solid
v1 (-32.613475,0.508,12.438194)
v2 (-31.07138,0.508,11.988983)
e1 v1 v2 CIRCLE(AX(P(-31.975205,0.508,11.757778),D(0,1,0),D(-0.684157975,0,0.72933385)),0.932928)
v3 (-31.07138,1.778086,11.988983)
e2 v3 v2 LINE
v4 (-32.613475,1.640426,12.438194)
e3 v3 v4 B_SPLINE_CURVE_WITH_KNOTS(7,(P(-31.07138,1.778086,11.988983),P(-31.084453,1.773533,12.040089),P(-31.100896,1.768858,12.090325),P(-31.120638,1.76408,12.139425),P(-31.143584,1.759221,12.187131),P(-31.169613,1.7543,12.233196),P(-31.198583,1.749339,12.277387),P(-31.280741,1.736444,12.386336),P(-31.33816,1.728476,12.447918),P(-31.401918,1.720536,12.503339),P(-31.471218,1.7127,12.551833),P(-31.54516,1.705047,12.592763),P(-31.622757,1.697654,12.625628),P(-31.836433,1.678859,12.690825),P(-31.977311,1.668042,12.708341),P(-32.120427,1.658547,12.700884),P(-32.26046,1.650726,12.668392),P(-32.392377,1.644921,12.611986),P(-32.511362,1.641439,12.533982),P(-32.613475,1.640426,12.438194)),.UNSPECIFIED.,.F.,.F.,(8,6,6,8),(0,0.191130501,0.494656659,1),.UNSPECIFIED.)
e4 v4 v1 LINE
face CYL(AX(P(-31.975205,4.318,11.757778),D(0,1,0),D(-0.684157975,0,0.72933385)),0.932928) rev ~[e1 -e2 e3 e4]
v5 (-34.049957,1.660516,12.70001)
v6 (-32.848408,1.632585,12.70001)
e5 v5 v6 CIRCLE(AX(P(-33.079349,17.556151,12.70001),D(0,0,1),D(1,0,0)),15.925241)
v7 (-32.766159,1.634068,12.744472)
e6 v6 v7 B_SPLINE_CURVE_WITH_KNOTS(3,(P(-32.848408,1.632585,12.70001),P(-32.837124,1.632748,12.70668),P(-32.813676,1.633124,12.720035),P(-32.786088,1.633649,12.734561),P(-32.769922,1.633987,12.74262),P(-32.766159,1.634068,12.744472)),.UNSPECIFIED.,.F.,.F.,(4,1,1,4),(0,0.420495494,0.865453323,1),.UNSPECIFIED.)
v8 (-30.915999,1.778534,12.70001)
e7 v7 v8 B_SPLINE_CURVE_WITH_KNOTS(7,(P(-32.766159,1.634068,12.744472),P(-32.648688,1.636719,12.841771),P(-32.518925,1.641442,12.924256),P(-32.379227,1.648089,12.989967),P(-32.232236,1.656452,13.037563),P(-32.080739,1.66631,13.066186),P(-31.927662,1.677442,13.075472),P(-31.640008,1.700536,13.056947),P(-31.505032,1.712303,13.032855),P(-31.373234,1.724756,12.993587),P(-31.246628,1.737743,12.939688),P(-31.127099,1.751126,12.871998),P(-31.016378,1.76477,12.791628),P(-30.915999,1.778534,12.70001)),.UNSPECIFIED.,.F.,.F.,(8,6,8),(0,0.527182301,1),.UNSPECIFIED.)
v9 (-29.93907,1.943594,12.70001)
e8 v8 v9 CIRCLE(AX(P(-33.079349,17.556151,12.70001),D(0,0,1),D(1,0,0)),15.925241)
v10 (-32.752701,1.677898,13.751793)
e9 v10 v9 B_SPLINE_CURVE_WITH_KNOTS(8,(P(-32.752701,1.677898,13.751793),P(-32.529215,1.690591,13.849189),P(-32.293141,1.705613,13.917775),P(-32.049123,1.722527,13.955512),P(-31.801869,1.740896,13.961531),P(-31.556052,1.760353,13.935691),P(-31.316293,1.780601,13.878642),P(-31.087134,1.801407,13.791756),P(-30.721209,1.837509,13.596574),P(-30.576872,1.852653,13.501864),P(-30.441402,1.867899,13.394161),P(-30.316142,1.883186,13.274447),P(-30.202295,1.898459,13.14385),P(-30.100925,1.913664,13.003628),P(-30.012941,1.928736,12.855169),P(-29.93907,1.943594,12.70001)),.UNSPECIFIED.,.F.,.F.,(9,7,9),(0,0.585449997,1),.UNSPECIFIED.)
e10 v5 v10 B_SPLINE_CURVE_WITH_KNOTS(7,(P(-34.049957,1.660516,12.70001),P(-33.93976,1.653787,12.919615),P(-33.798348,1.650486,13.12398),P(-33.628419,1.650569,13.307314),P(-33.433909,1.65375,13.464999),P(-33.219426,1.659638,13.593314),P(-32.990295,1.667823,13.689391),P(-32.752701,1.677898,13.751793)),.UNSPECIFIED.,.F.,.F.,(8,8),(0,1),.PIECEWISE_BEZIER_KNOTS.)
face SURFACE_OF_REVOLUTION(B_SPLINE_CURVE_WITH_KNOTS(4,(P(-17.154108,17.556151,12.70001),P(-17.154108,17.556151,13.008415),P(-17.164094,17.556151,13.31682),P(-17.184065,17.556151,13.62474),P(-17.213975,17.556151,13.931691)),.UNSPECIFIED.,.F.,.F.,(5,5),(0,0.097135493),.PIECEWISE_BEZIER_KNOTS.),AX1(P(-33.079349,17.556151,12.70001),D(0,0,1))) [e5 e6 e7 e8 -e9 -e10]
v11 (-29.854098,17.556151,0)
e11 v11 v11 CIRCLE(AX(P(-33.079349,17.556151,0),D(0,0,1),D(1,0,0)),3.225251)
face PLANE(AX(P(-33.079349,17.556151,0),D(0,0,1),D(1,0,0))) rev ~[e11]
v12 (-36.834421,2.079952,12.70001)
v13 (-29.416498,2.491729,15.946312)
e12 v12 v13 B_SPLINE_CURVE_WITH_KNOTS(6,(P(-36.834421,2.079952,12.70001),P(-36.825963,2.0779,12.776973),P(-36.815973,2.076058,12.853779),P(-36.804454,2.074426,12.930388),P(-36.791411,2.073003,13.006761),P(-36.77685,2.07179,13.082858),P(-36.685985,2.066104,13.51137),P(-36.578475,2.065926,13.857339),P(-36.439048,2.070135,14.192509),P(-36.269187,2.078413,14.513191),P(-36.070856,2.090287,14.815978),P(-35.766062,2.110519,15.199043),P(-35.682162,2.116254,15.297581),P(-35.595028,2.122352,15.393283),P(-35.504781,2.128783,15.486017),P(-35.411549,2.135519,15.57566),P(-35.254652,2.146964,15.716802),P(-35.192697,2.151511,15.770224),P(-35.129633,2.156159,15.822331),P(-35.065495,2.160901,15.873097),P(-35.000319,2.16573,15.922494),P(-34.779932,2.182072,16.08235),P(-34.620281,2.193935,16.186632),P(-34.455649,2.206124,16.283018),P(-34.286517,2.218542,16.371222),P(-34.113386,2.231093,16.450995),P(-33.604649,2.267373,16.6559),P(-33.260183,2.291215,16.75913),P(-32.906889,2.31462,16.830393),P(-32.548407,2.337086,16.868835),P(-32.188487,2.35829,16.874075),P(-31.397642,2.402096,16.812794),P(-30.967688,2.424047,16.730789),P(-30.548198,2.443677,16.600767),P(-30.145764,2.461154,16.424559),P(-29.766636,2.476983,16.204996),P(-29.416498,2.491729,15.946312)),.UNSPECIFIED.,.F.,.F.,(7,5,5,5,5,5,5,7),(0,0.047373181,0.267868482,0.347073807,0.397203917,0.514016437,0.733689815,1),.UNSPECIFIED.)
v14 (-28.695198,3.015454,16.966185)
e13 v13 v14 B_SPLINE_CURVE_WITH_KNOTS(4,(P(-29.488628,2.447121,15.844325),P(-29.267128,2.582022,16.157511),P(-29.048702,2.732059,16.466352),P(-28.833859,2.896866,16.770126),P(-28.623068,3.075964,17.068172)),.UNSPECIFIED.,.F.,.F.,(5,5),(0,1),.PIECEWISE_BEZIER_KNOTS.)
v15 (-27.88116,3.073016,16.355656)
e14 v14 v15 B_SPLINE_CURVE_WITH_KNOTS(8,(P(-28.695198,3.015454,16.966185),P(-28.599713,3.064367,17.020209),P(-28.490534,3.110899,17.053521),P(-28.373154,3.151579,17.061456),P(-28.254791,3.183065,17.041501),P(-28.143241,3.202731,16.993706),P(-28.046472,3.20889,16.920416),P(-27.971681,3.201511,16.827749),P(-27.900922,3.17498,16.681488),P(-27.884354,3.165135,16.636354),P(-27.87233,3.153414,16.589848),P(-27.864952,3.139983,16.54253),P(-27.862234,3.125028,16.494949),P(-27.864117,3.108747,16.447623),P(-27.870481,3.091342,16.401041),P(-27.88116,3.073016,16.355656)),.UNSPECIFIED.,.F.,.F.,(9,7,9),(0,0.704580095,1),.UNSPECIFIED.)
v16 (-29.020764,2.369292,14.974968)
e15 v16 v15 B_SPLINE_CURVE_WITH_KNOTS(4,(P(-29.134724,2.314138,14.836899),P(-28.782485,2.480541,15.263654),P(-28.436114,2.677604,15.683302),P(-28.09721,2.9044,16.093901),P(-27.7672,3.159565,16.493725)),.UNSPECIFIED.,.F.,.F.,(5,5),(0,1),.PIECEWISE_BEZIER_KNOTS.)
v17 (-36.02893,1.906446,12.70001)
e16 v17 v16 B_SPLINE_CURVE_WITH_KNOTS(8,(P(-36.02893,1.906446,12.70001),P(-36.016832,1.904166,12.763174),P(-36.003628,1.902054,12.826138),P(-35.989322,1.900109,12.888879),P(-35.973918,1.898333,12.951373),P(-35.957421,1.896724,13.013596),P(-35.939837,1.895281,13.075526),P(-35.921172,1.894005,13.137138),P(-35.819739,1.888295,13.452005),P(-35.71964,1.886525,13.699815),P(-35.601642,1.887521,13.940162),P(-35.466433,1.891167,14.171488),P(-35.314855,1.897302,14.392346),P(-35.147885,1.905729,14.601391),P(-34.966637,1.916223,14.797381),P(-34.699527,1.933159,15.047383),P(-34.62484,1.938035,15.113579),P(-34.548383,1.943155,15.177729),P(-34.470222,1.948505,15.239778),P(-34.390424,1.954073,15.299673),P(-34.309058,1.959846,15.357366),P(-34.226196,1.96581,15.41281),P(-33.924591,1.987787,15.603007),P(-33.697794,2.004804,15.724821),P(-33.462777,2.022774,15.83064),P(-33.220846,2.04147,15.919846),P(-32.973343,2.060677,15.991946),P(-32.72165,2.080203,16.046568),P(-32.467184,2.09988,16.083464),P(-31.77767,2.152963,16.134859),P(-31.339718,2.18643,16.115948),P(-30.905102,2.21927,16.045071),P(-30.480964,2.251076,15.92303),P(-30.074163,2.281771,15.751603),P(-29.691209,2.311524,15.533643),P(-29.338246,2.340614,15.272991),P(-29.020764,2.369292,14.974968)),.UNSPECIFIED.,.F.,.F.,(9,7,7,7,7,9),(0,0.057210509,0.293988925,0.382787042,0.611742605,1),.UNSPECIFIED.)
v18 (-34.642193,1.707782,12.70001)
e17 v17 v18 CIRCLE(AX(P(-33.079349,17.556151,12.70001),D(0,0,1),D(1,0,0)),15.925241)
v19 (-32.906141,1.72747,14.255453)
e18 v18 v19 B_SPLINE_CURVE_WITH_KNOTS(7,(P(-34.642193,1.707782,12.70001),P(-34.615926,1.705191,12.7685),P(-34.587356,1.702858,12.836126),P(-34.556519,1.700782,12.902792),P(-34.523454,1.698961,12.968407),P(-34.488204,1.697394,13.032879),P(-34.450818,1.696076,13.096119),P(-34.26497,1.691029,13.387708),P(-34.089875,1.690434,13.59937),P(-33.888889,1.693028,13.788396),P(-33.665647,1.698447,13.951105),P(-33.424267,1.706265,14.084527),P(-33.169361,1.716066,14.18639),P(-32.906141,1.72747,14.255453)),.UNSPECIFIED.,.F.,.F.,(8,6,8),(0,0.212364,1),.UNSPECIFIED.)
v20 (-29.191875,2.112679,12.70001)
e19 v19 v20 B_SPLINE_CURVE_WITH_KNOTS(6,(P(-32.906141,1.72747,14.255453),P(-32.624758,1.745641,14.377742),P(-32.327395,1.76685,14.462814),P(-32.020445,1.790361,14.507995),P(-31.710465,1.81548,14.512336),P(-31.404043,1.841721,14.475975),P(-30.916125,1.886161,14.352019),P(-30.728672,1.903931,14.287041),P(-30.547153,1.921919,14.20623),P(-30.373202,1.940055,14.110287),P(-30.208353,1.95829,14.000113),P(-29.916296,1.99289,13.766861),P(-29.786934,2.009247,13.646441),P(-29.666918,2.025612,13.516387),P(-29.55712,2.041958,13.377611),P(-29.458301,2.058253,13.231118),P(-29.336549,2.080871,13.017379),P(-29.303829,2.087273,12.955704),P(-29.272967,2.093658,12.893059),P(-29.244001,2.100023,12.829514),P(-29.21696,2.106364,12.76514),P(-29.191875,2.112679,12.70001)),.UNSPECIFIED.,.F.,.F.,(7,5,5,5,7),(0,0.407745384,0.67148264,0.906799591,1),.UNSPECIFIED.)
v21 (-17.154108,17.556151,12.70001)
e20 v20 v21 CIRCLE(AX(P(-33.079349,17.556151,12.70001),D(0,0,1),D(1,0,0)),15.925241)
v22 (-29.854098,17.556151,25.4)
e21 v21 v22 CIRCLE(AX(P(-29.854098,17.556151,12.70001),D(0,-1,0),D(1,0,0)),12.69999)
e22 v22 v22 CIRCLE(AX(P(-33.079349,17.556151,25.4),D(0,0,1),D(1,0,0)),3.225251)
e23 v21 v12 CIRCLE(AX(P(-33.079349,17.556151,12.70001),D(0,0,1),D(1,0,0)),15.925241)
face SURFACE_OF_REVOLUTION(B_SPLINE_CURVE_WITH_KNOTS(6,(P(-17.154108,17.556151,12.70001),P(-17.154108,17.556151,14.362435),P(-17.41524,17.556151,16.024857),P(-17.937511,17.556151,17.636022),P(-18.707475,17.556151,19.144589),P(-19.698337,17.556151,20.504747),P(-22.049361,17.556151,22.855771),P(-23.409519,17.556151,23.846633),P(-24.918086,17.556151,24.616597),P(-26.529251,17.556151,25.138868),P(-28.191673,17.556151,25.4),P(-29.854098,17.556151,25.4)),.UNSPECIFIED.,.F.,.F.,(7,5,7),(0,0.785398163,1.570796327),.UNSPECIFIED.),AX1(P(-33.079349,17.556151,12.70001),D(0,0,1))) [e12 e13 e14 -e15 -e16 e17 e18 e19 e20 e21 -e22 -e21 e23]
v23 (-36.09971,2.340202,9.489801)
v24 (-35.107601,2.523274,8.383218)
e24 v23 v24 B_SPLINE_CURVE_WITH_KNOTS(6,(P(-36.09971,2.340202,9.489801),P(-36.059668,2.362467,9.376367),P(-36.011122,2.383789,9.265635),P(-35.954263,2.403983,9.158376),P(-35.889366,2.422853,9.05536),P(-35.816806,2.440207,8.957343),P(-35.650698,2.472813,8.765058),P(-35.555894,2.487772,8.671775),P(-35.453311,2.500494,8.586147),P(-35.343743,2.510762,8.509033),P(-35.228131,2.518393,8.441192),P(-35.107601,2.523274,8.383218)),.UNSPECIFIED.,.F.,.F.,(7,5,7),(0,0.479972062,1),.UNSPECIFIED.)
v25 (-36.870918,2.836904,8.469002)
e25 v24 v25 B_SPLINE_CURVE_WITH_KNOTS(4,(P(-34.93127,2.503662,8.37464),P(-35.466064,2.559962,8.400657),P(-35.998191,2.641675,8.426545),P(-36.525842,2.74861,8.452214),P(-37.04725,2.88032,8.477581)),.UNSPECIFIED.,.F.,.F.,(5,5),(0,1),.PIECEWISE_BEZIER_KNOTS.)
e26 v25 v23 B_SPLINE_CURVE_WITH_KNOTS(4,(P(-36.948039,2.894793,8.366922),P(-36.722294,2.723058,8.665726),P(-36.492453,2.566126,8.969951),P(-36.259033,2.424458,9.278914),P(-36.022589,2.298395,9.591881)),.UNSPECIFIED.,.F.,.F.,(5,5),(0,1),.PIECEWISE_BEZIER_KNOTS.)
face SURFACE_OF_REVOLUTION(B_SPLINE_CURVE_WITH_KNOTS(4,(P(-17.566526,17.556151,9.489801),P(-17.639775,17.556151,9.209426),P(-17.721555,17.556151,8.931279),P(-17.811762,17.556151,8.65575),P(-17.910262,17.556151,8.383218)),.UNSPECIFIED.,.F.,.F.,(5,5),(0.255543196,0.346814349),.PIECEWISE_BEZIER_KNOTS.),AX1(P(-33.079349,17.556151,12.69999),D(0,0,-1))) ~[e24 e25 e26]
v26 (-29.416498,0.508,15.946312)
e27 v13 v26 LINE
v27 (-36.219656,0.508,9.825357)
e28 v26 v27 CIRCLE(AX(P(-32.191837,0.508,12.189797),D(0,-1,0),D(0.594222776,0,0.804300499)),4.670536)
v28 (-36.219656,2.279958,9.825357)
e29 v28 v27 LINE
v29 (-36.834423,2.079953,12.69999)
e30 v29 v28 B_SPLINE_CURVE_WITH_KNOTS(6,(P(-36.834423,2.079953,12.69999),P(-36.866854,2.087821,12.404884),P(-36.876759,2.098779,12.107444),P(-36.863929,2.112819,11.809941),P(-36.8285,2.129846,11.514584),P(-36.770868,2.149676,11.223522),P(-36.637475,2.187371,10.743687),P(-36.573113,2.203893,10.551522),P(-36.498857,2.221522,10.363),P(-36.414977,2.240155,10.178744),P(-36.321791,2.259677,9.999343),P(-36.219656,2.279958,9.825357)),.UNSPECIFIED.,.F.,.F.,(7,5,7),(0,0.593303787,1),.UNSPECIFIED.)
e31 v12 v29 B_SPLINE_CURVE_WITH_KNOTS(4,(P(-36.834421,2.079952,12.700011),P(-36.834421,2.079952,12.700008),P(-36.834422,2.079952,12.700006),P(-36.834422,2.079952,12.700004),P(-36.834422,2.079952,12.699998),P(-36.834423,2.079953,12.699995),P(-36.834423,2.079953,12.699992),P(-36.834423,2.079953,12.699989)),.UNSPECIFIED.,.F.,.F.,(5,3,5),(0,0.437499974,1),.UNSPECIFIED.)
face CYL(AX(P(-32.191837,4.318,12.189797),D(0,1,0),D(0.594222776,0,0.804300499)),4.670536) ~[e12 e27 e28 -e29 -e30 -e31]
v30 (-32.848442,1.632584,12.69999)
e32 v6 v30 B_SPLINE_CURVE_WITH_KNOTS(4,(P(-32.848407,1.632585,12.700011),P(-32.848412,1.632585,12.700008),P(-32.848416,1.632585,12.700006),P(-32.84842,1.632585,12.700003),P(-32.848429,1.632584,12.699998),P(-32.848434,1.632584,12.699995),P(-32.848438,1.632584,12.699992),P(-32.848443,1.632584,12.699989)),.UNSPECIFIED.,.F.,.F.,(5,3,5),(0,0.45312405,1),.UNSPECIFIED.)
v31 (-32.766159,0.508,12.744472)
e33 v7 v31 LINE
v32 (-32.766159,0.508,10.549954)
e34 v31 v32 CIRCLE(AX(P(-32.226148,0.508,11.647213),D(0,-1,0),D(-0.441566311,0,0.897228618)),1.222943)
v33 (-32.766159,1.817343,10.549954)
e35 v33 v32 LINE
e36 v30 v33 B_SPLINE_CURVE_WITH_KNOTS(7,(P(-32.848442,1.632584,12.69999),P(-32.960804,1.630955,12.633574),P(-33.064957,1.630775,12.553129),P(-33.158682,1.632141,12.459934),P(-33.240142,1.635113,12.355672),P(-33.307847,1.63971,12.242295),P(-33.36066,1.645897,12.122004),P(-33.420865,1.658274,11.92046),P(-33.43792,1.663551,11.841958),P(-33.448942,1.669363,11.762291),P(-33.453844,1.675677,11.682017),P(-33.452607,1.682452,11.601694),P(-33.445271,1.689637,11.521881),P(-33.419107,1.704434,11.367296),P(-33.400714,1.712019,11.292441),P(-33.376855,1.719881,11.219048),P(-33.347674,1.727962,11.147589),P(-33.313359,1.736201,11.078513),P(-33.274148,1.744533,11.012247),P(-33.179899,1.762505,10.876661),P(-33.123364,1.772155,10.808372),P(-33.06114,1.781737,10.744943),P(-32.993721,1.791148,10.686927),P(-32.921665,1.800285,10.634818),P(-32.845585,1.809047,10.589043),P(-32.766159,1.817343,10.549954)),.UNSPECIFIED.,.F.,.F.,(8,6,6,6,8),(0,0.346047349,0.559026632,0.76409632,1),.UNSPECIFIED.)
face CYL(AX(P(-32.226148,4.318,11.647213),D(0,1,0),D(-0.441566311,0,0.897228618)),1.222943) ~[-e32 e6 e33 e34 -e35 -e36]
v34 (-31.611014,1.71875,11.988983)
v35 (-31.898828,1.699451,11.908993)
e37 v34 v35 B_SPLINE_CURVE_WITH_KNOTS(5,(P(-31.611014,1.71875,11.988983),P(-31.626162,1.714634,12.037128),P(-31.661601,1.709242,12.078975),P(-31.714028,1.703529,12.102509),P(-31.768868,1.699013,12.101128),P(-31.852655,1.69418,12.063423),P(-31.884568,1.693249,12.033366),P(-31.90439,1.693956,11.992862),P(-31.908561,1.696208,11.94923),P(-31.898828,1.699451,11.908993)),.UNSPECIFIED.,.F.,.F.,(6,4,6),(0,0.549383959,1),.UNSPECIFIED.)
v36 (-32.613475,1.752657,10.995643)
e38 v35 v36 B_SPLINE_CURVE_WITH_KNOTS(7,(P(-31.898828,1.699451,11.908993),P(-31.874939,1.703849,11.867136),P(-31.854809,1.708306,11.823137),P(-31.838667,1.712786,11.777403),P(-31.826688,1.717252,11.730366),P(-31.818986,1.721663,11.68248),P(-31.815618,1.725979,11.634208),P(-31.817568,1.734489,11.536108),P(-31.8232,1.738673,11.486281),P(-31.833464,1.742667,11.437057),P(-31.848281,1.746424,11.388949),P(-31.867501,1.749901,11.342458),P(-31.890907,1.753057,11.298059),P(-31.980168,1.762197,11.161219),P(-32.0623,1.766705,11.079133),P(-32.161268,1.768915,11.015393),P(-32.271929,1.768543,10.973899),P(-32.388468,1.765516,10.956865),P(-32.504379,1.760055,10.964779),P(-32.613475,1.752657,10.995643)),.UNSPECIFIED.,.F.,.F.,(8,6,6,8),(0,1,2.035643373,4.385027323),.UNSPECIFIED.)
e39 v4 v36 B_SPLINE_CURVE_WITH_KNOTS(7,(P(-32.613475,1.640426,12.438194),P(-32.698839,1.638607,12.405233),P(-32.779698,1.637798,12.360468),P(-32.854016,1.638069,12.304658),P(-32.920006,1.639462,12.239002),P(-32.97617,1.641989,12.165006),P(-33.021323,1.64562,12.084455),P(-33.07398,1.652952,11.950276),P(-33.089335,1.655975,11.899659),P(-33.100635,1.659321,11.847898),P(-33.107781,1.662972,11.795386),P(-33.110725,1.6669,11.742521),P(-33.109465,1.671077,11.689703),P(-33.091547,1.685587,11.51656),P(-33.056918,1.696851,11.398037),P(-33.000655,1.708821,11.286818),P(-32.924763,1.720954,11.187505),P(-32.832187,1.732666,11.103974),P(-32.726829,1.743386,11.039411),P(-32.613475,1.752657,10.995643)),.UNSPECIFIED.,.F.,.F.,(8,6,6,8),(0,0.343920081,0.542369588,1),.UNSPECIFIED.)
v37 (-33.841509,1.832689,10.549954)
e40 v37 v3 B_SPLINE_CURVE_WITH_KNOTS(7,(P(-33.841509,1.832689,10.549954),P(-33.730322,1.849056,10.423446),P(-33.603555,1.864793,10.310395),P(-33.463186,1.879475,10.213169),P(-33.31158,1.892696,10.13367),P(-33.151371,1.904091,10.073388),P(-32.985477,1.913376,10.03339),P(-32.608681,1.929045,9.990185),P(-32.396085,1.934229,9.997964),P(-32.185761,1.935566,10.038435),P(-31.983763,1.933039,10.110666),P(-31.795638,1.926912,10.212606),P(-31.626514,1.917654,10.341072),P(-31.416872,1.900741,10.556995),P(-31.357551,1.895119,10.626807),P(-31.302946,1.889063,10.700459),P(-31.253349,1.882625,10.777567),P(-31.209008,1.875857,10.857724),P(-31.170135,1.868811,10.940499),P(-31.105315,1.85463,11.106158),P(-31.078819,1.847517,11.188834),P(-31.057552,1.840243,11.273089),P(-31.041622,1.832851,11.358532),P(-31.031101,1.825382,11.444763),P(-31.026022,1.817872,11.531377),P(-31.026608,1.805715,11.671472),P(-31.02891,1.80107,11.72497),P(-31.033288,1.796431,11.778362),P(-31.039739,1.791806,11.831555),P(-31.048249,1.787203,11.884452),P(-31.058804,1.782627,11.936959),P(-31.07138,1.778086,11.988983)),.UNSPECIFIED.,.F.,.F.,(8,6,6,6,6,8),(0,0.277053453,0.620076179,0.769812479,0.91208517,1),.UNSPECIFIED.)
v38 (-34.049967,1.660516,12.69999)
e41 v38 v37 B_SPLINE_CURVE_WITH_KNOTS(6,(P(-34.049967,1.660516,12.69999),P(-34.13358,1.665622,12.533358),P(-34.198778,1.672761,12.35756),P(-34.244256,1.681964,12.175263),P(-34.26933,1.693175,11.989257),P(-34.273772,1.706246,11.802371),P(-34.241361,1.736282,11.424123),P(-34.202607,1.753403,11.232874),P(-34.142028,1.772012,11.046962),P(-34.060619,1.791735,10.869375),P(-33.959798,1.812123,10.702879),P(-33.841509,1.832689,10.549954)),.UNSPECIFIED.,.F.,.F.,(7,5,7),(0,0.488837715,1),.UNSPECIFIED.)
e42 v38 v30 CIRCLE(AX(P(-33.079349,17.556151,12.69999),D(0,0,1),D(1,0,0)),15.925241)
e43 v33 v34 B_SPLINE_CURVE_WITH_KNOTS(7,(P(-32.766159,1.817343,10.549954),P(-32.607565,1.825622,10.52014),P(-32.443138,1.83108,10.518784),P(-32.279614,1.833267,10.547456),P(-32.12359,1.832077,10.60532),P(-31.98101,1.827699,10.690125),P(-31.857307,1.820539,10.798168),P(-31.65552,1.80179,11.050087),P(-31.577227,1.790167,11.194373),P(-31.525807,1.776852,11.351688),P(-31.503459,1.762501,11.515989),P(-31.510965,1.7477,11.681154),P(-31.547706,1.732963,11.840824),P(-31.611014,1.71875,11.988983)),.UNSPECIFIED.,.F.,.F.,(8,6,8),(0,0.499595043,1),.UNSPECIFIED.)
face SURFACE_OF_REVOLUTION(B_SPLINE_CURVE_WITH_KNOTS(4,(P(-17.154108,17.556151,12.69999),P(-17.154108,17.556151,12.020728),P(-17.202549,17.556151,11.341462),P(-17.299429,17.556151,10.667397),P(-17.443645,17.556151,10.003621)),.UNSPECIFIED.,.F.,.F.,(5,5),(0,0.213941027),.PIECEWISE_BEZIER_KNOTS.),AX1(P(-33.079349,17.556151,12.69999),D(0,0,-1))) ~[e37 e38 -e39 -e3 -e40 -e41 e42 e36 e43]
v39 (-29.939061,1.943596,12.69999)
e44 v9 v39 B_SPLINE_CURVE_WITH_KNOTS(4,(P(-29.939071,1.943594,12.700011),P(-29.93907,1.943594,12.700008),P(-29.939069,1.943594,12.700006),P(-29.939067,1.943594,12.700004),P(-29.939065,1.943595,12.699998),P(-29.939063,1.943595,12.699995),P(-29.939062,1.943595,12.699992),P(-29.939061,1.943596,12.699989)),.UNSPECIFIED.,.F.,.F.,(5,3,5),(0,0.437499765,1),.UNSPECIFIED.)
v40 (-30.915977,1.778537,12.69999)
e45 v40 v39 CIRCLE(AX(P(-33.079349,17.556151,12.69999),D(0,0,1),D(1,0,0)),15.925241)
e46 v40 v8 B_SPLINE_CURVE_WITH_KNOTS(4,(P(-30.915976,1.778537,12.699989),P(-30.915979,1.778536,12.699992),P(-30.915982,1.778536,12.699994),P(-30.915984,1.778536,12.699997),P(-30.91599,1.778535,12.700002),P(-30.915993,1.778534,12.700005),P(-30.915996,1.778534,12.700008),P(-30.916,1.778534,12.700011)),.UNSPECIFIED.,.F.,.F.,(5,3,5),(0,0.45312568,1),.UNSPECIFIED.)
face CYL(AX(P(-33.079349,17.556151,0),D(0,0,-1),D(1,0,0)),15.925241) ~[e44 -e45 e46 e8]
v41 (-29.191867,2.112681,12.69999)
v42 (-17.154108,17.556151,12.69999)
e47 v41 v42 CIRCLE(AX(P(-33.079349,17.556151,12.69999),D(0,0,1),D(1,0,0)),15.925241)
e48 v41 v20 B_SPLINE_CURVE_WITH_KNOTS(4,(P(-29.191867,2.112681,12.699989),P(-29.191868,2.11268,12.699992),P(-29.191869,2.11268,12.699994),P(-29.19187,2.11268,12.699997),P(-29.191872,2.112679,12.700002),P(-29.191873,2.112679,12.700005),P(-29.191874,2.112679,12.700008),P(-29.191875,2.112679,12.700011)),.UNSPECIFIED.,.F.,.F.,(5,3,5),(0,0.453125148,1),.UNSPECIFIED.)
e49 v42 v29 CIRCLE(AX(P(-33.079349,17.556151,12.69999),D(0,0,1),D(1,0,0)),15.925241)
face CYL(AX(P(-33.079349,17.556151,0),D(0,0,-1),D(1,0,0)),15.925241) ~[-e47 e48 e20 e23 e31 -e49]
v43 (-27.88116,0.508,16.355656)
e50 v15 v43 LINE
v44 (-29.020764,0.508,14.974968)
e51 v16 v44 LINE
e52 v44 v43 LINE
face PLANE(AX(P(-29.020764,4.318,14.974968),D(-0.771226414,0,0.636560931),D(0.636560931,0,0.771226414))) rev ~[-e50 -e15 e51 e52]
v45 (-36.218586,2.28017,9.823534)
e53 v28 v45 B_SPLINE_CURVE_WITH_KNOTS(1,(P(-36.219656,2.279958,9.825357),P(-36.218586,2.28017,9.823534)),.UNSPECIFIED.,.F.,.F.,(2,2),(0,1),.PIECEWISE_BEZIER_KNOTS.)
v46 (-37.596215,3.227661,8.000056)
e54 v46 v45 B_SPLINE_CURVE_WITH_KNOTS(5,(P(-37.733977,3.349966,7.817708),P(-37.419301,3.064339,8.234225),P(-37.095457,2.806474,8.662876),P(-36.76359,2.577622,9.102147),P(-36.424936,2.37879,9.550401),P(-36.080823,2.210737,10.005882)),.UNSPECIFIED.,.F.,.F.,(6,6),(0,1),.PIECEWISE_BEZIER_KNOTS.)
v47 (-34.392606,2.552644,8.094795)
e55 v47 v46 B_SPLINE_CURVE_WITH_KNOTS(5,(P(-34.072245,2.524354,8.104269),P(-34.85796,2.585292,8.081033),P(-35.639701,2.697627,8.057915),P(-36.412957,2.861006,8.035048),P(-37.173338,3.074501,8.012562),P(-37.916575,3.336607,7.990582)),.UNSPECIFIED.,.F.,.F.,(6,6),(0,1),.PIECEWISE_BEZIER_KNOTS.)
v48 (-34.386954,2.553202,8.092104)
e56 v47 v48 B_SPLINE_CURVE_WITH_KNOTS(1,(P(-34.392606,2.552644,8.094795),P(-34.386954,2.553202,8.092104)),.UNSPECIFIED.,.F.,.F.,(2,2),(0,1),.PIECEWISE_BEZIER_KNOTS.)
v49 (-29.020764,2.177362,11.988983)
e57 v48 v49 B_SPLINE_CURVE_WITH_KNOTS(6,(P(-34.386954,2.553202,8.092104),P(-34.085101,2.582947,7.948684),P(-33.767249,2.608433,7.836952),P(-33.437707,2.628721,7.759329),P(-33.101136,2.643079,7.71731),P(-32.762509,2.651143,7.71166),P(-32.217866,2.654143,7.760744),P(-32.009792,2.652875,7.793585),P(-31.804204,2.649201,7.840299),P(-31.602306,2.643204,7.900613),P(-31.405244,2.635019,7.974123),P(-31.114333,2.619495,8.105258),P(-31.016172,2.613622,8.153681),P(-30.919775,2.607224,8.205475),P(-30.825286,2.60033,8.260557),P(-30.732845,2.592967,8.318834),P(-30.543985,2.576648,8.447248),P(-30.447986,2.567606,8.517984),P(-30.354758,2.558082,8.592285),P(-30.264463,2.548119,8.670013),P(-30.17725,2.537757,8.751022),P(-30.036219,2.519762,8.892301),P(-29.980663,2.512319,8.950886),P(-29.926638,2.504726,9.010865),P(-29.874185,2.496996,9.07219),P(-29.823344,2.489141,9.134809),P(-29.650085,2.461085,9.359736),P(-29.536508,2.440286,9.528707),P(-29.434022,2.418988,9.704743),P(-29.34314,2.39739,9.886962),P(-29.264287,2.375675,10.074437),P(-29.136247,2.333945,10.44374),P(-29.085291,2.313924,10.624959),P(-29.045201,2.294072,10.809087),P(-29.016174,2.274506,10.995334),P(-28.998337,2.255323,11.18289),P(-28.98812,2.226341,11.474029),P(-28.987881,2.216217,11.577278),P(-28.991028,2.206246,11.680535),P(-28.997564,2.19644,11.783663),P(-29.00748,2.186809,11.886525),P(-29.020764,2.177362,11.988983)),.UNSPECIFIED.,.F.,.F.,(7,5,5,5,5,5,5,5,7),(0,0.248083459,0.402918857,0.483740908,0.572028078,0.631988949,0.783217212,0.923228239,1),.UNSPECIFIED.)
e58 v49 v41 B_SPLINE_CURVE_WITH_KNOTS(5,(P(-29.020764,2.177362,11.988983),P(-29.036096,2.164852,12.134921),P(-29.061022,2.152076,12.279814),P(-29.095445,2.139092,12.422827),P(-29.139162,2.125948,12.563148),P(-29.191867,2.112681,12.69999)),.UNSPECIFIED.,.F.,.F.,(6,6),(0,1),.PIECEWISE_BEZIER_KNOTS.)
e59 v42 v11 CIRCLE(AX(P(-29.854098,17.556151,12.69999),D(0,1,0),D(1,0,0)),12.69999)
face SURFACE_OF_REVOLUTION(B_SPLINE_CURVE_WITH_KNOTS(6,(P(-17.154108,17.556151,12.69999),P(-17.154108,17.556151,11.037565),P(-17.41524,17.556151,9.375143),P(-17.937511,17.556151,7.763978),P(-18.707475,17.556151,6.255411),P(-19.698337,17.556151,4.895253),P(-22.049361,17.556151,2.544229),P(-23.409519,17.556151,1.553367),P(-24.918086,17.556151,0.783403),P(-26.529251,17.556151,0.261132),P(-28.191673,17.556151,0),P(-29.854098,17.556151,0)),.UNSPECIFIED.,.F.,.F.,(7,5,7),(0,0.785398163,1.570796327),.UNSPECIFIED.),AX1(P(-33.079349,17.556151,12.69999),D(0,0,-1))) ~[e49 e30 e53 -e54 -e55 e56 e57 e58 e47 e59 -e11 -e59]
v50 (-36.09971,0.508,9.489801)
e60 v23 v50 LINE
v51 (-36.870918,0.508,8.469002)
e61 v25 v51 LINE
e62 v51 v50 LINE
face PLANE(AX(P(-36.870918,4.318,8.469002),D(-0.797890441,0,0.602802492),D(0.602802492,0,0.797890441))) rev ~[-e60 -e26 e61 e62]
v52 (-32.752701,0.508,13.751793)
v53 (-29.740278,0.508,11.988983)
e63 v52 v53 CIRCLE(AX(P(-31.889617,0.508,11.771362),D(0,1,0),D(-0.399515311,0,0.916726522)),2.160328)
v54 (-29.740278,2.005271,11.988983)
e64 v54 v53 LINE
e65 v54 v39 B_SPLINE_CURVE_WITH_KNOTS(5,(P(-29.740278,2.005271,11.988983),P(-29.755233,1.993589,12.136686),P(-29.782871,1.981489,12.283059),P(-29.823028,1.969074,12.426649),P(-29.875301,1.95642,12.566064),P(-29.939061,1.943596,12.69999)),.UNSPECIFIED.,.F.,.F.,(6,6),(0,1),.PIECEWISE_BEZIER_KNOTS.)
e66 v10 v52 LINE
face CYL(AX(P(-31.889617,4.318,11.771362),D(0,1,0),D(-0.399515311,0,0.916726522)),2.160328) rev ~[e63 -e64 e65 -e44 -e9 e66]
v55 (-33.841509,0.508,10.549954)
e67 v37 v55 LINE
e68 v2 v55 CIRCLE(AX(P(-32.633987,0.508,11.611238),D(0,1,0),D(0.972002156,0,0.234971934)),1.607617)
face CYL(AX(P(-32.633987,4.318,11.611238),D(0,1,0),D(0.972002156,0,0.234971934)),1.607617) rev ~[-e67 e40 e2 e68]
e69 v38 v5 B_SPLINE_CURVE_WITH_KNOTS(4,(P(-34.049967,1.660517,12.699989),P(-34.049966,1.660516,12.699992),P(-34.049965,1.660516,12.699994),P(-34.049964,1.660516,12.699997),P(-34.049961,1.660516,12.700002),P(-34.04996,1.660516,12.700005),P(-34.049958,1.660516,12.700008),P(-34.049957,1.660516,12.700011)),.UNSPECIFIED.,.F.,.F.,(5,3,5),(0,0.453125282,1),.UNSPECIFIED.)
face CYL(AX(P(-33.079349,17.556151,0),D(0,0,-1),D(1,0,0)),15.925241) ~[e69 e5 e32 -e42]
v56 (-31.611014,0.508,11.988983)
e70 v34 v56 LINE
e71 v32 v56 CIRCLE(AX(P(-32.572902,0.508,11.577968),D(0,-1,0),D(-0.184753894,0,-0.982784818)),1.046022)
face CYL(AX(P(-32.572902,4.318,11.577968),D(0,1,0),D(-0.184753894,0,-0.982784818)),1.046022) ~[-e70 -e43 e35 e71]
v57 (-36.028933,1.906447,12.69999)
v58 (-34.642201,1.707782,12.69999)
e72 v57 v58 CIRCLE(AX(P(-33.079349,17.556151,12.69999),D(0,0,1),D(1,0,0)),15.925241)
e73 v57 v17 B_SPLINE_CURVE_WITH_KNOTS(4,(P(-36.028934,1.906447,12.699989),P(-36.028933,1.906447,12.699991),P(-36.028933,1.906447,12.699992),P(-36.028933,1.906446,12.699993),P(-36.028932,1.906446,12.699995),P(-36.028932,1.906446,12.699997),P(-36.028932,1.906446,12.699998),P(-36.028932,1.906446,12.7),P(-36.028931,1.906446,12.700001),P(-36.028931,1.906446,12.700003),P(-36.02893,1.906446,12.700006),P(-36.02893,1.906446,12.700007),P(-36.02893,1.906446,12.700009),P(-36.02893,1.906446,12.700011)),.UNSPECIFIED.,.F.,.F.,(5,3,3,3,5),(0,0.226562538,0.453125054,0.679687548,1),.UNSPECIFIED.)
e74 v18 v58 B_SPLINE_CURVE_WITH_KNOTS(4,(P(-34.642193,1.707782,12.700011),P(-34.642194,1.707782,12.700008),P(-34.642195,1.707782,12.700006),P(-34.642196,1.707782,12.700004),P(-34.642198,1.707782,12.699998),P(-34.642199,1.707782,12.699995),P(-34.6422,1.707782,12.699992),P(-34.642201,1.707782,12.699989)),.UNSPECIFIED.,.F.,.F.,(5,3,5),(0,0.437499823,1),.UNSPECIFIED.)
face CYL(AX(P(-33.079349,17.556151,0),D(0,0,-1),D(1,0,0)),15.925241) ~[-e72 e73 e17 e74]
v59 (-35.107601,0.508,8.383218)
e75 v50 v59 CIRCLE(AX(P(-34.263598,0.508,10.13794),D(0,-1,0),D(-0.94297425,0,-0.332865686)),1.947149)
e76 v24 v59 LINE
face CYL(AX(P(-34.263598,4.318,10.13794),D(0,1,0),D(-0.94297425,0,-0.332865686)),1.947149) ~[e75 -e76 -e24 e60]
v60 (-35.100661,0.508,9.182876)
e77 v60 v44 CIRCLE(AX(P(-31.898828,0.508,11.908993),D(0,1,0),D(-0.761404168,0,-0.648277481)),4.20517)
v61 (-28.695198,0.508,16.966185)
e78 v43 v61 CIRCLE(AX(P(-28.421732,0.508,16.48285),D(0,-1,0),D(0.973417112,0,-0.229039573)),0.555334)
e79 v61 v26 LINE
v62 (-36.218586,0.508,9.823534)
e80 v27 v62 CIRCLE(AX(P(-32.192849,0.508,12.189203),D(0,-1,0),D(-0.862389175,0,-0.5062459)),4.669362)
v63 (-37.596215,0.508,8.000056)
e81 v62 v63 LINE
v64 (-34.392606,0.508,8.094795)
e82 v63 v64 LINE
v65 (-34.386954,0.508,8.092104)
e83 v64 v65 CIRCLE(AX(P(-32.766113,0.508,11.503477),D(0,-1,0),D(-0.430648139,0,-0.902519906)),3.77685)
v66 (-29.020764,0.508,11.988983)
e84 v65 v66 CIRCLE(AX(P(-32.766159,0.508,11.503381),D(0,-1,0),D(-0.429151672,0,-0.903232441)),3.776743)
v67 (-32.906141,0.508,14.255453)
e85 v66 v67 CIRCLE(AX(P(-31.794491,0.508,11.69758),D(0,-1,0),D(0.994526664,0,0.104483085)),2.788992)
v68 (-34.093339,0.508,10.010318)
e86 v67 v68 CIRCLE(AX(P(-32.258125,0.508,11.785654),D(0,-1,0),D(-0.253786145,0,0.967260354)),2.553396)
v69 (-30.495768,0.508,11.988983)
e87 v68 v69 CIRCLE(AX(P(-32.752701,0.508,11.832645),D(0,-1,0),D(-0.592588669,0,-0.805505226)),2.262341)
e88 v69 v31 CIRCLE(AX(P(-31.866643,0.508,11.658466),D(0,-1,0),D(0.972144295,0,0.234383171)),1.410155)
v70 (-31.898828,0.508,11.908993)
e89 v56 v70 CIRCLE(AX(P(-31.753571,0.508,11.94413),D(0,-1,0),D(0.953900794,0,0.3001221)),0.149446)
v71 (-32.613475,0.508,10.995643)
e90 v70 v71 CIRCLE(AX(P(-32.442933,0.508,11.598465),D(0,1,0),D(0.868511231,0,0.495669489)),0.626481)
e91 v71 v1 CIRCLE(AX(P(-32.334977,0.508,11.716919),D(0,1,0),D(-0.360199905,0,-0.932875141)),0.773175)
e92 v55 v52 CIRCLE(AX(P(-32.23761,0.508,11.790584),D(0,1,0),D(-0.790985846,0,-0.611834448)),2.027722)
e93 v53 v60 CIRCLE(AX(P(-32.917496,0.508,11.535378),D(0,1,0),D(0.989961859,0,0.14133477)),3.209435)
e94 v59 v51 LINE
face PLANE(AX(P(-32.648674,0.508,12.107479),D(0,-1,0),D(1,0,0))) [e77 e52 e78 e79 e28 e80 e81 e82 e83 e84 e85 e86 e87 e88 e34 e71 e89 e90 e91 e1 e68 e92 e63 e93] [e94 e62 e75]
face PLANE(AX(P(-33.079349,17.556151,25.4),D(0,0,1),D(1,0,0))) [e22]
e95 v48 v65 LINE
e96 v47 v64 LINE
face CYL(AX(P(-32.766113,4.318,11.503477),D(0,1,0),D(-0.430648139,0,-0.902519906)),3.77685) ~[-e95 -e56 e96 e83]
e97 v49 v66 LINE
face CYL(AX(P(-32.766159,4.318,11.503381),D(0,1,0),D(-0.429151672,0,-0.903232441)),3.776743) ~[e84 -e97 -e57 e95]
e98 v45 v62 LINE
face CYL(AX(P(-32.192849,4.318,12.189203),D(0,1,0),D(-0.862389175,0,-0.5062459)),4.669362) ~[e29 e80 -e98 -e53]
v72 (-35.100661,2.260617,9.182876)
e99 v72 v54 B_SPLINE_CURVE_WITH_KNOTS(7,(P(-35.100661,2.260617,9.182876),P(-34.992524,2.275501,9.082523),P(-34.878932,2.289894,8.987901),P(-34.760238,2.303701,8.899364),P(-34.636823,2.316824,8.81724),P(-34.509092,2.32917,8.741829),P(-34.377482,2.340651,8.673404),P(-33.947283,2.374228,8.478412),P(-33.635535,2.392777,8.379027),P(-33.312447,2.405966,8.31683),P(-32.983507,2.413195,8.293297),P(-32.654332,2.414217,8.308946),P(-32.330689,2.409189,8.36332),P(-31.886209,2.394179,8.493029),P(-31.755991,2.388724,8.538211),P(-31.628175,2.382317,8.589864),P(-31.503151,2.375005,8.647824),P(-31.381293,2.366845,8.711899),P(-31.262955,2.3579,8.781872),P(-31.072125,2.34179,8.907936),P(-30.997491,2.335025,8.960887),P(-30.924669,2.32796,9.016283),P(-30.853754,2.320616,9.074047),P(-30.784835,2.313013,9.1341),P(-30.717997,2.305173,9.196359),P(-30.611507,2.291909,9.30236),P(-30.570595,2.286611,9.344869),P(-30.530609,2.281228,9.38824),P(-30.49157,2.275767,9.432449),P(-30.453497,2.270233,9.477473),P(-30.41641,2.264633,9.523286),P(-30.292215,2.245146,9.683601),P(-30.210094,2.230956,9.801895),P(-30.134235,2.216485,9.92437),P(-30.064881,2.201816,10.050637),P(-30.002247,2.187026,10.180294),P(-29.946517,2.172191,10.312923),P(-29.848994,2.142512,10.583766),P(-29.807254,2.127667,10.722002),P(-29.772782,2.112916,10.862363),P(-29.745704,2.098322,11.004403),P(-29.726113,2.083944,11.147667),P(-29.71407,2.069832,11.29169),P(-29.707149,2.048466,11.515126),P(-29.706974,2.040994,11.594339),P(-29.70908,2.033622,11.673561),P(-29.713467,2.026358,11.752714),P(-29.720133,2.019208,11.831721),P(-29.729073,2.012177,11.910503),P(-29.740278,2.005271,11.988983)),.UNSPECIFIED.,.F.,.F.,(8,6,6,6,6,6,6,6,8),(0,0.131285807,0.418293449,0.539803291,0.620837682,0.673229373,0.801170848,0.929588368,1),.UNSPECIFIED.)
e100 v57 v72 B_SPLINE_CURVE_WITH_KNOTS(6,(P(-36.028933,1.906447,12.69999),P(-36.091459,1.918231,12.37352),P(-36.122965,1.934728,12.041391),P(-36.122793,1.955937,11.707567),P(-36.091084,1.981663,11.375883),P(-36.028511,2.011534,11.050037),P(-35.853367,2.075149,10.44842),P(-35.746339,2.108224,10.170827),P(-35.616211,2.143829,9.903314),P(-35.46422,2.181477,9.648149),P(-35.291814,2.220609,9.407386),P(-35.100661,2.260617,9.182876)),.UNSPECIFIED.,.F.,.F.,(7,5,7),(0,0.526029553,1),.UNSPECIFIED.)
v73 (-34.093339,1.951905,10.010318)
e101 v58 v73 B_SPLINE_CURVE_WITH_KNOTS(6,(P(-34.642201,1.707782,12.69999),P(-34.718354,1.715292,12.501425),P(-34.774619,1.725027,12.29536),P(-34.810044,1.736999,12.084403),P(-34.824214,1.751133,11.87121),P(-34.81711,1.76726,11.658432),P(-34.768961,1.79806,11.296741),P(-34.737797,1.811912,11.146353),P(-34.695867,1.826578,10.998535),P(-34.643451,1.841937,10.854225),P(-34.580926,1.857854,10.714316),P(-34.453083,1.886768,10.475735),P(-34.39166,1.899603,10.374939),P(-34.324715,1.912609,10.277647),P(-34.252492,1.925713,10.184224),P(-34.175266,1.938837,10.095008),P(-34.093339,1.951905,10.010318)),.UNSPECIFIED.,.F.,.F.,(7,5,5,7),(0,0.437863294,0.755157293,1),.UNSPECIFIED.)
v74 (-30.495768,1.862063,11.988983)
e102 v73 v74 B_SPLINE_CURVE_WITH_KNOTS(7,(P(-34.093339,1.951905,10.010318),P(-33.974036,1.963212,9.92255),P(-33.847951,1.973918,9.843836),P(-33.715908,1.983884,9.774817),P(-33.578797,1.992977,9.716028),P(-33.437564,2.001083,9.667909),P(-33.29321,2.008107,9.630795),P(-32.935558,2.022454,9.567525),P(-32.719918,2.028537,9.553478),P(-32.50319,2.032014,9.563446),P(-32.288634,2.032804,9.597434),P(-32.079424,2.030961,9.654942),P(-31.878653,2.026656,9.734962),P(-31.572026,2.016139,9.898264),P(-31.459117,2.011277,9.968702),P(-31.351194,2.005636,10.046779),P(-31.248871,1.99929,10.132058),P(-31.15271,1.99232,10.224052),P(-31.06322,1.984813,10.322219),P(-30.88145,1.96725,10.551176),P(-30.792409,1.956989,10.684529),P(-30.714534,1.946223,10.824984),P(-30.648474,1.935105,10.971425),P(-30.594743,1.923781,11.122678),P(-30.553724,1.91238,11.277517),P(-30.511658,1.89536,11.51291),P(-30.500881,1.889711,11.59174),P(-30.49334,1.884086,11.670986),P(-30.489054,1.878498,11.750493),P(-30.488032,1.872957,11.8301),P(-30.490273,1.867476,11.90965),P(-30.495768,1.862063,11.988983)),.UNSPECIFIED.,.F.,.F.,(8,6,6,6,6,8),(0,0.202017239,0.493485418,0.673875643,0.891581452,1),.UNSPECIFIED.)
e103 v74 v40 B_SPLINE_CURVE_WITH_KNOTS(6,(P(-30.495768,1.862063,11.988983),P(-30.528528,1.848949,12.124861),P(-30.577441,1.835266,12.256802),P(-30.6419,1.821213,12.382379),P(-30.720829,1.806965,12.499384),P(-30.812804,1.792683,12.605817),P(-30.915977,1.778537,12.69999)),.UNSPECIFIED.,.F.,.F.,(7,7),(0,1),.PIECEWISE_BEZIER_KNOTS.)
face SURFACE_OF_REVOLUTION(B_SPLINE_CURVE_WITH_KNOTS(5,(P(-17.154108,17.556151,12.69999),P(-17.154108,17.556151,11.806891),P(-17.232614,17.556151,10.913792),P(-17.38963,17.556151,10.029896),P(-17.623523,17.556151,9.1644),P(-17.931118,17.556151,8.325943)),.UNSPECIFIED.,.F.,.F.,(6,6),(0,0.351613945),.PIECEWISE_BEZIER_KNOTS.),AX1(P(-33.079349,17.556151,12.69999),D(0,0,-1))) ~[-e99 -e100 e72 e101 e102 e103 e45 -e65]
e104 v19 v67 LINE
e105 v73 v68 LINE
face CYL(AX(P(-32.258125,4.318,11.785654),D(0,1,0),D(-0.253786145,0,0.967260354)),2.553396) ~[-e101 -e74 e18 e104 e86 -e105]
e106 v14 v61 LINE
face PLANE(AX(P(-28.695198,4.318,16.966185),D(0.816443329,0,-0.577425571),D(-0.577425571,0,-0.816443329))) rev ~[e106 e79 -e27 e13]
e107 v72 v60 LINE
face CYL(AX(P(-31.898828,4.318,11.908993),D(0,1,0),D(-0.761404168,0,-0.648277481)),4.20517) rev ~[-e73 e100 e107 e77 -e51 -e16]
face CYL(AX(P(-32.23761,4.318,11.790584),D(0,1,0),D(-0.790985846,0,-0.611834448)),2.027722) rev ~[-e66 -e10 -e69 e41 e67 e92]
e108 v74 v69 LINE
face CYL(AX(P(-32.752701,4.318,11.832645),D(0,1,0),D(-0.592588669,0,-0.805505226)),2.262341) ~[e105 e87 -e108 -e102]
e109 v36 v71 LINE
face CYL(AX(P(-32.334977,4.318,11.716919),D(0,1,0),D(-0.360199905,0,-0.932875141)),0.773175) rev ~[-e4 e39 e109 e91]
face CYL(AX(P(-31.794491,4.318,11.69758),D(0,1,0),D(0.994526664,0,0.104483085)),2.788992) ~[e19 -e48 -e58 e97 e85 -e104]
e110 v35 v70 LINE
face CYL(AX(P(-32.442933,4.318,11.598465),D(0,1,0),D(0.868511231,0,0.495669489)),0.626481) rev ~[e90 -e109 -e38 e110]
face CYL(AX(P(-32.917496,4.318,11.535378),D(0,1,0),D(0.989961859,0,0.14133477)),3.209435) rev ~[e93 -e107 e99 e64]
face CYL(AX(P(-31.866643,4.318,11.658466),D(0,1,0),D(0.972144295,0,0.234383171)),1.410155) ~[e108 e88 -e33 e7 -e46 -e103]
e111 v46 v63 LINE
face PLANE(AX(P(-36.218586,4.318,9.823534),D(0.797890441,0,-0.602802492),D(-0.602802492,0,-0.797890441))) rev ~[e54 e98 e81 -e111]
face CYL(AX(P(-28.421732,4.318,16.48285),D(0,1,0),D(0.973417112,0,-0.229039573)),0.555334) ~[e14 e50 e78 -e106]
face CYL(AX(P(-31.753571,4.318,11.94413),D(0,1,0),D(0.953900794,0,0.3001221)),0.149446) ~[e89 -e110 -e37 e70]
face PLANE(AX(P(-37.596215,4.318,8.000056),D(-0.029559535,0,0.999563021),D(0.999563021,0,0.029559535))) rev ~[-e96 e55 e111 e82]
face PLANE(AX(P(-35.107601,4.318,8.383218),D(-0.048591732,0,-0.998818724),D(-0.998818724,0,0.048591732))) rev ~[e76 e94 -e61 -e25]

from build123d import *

# Parameters (mm, degrees)
F0_R     = 15.9252412
F1_DEPTH = 25.4
F2_R     = 12.69999
F5_DEPTH = 3.81


# Not quite as in the source:
# - a fillet or chamfer is up to 0.001 mm smaller than in the source, because OpenCascade refuses the exact size


with BuildPart() as f1:
    # F0 (on Top) → F1 (new body)
    with BuildSketch(Plane.XY):
        with Locations((-33.0793492307, 17.5561513754)):
            Circle(F0_R)
    extrude(amount=F1_DEPTH)

    # F2 (radius 12.7 in the source; OpenCascade refuses exactly that, so slightly less here)
    f2_edges = [f1.edges().sort_by_distance(p)[0] for p in [
        (-49.00459, 17.556151, 25.4),
        (-49.00459, 17.556151, 0),
    ]]
    fillet(f2_edges, radius=F2_R)

    # F4 (on offset) → F5 (join)
    with BuildSketch(Plane.XZ.offset(-4.318)):
        with BuildLine():
            Line((-29.0207639337, 14.9749675766), (-27.8811603785, 16.3556560874))
            ThreePointArc((-27.8811603785, 16.3556560874), (-28.0885315249, 16.9271168776), (-28.695197776, 16.9661846012))
            Line((-28.695197776, 16.9661846012), (-29.4164977968, 15.9463118762))
            ThreePointArc((-29.4164977968, 15.9463118762), (-35.315728181, 15.6618586245), (-36.2196562996, 9.8253573836))
            ThreePointArc((-36.2196562996, 9.8253573836), (-36.219121003, 9.824445743), (-36.2185855, 9.8235342236))
            Line((-36.2185855, 9.8235342236), (-37.5962145627, 8.0000562593))
            Line((-37.5962145627, 8.0000562593), (-34.392606223, 8.0947948317))
            ThreePointArc((-34.392606223, 8.0947948317), (-34.3897808352, 8.0934481012), (-34.3869543323, 8.0921037126))
            ThreePointArc((-34.3869543323, 8.0921037126), (-30.5469478577, 8.4474204279), (-29.0207639337, 11.9889825583))
            ThreePointArc((-29.0207639337, 11.9889825583), (-30.3891986708, 14.106652787), (-32.9061411321, 14.2554529011))
            ThreePointArc((-32.9061411321, 14.2554529011), (-34.717169495, 12.4733526926), (-34.0933389962, 10.0103178993))
            ThreePointArc((-34.0933389962, 10.0103178993), (-31.6624363369, 9.8503464108), (-30.4957684129, 11.9889825583))
            ThreePointArc((-30.4957684129, 11.9889825583), (-31.4214059538, 12.9964876797), (-32.7661586101, 12.7444723621))
            ThreePointArc((-32.7661586101, 12.7444723621), (-33.4490909653, 11.6472132504), (-32.7661586101, 10.5499541387))
            ThreePointArc((-32.7661586101, 10.5499541387), (-31.7571819842, 10.9231691425), (-31.6110141575, 11.9889825583))
            ThreePointArc((-31.6110141575, 11.9889825583), (-31.7935886004, 12.08811911), (-31.8988275295, 11.9089927555))
            ThreePointArc((-31.8988275295, 11.9089927555), (-31.9495376202, 11.212409195), (-32.6134748757, 10.9956432134))
            ThreePointArc((-32.6134748757, 10.9956432134), (-33.1081520423, 11.7169185542), (-32.6134748757, 12.4381938949))
            ThreePointArc((-32.6134748757, 12.4381938949), (-31.714287938, 12.6534772255), (-31.0713797808, 11.9889825583))
            ThreePointArc((-31.0713797808, 11.9889825583), (-31.8928919194, 10.1846295294), (-33.841509372, 10.5499541387))
            ThreePointArc((-33.841509372, 10.5499541387), (-34.1573684854, 12.4434120609), (-32.7527012902, 13.7517927215))
            ThreePointArc((-32.7527012902, 13.7517927215), (-30.7985222002, 13.6359080863), (-29.7402776778, 11.9889825583))
            ThreePointArc((-29.7402776778, 11.9889825583), (-31.4290089637, 8.6919853613), (-35.1006612182, 9.182875976))
            ThreePointArc((-35.1006612182, 9.182875976), (-34.7993943786, 14.9536870948), (-29.0207639337, 14.9749675766))
        make_face()
        with BuildLine():
            Line((-36.8709181573, 8.4690021479), (-36.0997095704, 9.489800781))
            ThreePointArc((-36.0997095704, 9.489800781), (-35.713386033, 8.8381304316), (-35.107601434, 8.383218199))
            Line((-35.107601434, 8.383218199), (-36.8709181573, 8.4690021479))
        make_face(mode=Mode.SUBTRACT)
    extrude(amount=F5_DEPTH)


solid = f1.part
